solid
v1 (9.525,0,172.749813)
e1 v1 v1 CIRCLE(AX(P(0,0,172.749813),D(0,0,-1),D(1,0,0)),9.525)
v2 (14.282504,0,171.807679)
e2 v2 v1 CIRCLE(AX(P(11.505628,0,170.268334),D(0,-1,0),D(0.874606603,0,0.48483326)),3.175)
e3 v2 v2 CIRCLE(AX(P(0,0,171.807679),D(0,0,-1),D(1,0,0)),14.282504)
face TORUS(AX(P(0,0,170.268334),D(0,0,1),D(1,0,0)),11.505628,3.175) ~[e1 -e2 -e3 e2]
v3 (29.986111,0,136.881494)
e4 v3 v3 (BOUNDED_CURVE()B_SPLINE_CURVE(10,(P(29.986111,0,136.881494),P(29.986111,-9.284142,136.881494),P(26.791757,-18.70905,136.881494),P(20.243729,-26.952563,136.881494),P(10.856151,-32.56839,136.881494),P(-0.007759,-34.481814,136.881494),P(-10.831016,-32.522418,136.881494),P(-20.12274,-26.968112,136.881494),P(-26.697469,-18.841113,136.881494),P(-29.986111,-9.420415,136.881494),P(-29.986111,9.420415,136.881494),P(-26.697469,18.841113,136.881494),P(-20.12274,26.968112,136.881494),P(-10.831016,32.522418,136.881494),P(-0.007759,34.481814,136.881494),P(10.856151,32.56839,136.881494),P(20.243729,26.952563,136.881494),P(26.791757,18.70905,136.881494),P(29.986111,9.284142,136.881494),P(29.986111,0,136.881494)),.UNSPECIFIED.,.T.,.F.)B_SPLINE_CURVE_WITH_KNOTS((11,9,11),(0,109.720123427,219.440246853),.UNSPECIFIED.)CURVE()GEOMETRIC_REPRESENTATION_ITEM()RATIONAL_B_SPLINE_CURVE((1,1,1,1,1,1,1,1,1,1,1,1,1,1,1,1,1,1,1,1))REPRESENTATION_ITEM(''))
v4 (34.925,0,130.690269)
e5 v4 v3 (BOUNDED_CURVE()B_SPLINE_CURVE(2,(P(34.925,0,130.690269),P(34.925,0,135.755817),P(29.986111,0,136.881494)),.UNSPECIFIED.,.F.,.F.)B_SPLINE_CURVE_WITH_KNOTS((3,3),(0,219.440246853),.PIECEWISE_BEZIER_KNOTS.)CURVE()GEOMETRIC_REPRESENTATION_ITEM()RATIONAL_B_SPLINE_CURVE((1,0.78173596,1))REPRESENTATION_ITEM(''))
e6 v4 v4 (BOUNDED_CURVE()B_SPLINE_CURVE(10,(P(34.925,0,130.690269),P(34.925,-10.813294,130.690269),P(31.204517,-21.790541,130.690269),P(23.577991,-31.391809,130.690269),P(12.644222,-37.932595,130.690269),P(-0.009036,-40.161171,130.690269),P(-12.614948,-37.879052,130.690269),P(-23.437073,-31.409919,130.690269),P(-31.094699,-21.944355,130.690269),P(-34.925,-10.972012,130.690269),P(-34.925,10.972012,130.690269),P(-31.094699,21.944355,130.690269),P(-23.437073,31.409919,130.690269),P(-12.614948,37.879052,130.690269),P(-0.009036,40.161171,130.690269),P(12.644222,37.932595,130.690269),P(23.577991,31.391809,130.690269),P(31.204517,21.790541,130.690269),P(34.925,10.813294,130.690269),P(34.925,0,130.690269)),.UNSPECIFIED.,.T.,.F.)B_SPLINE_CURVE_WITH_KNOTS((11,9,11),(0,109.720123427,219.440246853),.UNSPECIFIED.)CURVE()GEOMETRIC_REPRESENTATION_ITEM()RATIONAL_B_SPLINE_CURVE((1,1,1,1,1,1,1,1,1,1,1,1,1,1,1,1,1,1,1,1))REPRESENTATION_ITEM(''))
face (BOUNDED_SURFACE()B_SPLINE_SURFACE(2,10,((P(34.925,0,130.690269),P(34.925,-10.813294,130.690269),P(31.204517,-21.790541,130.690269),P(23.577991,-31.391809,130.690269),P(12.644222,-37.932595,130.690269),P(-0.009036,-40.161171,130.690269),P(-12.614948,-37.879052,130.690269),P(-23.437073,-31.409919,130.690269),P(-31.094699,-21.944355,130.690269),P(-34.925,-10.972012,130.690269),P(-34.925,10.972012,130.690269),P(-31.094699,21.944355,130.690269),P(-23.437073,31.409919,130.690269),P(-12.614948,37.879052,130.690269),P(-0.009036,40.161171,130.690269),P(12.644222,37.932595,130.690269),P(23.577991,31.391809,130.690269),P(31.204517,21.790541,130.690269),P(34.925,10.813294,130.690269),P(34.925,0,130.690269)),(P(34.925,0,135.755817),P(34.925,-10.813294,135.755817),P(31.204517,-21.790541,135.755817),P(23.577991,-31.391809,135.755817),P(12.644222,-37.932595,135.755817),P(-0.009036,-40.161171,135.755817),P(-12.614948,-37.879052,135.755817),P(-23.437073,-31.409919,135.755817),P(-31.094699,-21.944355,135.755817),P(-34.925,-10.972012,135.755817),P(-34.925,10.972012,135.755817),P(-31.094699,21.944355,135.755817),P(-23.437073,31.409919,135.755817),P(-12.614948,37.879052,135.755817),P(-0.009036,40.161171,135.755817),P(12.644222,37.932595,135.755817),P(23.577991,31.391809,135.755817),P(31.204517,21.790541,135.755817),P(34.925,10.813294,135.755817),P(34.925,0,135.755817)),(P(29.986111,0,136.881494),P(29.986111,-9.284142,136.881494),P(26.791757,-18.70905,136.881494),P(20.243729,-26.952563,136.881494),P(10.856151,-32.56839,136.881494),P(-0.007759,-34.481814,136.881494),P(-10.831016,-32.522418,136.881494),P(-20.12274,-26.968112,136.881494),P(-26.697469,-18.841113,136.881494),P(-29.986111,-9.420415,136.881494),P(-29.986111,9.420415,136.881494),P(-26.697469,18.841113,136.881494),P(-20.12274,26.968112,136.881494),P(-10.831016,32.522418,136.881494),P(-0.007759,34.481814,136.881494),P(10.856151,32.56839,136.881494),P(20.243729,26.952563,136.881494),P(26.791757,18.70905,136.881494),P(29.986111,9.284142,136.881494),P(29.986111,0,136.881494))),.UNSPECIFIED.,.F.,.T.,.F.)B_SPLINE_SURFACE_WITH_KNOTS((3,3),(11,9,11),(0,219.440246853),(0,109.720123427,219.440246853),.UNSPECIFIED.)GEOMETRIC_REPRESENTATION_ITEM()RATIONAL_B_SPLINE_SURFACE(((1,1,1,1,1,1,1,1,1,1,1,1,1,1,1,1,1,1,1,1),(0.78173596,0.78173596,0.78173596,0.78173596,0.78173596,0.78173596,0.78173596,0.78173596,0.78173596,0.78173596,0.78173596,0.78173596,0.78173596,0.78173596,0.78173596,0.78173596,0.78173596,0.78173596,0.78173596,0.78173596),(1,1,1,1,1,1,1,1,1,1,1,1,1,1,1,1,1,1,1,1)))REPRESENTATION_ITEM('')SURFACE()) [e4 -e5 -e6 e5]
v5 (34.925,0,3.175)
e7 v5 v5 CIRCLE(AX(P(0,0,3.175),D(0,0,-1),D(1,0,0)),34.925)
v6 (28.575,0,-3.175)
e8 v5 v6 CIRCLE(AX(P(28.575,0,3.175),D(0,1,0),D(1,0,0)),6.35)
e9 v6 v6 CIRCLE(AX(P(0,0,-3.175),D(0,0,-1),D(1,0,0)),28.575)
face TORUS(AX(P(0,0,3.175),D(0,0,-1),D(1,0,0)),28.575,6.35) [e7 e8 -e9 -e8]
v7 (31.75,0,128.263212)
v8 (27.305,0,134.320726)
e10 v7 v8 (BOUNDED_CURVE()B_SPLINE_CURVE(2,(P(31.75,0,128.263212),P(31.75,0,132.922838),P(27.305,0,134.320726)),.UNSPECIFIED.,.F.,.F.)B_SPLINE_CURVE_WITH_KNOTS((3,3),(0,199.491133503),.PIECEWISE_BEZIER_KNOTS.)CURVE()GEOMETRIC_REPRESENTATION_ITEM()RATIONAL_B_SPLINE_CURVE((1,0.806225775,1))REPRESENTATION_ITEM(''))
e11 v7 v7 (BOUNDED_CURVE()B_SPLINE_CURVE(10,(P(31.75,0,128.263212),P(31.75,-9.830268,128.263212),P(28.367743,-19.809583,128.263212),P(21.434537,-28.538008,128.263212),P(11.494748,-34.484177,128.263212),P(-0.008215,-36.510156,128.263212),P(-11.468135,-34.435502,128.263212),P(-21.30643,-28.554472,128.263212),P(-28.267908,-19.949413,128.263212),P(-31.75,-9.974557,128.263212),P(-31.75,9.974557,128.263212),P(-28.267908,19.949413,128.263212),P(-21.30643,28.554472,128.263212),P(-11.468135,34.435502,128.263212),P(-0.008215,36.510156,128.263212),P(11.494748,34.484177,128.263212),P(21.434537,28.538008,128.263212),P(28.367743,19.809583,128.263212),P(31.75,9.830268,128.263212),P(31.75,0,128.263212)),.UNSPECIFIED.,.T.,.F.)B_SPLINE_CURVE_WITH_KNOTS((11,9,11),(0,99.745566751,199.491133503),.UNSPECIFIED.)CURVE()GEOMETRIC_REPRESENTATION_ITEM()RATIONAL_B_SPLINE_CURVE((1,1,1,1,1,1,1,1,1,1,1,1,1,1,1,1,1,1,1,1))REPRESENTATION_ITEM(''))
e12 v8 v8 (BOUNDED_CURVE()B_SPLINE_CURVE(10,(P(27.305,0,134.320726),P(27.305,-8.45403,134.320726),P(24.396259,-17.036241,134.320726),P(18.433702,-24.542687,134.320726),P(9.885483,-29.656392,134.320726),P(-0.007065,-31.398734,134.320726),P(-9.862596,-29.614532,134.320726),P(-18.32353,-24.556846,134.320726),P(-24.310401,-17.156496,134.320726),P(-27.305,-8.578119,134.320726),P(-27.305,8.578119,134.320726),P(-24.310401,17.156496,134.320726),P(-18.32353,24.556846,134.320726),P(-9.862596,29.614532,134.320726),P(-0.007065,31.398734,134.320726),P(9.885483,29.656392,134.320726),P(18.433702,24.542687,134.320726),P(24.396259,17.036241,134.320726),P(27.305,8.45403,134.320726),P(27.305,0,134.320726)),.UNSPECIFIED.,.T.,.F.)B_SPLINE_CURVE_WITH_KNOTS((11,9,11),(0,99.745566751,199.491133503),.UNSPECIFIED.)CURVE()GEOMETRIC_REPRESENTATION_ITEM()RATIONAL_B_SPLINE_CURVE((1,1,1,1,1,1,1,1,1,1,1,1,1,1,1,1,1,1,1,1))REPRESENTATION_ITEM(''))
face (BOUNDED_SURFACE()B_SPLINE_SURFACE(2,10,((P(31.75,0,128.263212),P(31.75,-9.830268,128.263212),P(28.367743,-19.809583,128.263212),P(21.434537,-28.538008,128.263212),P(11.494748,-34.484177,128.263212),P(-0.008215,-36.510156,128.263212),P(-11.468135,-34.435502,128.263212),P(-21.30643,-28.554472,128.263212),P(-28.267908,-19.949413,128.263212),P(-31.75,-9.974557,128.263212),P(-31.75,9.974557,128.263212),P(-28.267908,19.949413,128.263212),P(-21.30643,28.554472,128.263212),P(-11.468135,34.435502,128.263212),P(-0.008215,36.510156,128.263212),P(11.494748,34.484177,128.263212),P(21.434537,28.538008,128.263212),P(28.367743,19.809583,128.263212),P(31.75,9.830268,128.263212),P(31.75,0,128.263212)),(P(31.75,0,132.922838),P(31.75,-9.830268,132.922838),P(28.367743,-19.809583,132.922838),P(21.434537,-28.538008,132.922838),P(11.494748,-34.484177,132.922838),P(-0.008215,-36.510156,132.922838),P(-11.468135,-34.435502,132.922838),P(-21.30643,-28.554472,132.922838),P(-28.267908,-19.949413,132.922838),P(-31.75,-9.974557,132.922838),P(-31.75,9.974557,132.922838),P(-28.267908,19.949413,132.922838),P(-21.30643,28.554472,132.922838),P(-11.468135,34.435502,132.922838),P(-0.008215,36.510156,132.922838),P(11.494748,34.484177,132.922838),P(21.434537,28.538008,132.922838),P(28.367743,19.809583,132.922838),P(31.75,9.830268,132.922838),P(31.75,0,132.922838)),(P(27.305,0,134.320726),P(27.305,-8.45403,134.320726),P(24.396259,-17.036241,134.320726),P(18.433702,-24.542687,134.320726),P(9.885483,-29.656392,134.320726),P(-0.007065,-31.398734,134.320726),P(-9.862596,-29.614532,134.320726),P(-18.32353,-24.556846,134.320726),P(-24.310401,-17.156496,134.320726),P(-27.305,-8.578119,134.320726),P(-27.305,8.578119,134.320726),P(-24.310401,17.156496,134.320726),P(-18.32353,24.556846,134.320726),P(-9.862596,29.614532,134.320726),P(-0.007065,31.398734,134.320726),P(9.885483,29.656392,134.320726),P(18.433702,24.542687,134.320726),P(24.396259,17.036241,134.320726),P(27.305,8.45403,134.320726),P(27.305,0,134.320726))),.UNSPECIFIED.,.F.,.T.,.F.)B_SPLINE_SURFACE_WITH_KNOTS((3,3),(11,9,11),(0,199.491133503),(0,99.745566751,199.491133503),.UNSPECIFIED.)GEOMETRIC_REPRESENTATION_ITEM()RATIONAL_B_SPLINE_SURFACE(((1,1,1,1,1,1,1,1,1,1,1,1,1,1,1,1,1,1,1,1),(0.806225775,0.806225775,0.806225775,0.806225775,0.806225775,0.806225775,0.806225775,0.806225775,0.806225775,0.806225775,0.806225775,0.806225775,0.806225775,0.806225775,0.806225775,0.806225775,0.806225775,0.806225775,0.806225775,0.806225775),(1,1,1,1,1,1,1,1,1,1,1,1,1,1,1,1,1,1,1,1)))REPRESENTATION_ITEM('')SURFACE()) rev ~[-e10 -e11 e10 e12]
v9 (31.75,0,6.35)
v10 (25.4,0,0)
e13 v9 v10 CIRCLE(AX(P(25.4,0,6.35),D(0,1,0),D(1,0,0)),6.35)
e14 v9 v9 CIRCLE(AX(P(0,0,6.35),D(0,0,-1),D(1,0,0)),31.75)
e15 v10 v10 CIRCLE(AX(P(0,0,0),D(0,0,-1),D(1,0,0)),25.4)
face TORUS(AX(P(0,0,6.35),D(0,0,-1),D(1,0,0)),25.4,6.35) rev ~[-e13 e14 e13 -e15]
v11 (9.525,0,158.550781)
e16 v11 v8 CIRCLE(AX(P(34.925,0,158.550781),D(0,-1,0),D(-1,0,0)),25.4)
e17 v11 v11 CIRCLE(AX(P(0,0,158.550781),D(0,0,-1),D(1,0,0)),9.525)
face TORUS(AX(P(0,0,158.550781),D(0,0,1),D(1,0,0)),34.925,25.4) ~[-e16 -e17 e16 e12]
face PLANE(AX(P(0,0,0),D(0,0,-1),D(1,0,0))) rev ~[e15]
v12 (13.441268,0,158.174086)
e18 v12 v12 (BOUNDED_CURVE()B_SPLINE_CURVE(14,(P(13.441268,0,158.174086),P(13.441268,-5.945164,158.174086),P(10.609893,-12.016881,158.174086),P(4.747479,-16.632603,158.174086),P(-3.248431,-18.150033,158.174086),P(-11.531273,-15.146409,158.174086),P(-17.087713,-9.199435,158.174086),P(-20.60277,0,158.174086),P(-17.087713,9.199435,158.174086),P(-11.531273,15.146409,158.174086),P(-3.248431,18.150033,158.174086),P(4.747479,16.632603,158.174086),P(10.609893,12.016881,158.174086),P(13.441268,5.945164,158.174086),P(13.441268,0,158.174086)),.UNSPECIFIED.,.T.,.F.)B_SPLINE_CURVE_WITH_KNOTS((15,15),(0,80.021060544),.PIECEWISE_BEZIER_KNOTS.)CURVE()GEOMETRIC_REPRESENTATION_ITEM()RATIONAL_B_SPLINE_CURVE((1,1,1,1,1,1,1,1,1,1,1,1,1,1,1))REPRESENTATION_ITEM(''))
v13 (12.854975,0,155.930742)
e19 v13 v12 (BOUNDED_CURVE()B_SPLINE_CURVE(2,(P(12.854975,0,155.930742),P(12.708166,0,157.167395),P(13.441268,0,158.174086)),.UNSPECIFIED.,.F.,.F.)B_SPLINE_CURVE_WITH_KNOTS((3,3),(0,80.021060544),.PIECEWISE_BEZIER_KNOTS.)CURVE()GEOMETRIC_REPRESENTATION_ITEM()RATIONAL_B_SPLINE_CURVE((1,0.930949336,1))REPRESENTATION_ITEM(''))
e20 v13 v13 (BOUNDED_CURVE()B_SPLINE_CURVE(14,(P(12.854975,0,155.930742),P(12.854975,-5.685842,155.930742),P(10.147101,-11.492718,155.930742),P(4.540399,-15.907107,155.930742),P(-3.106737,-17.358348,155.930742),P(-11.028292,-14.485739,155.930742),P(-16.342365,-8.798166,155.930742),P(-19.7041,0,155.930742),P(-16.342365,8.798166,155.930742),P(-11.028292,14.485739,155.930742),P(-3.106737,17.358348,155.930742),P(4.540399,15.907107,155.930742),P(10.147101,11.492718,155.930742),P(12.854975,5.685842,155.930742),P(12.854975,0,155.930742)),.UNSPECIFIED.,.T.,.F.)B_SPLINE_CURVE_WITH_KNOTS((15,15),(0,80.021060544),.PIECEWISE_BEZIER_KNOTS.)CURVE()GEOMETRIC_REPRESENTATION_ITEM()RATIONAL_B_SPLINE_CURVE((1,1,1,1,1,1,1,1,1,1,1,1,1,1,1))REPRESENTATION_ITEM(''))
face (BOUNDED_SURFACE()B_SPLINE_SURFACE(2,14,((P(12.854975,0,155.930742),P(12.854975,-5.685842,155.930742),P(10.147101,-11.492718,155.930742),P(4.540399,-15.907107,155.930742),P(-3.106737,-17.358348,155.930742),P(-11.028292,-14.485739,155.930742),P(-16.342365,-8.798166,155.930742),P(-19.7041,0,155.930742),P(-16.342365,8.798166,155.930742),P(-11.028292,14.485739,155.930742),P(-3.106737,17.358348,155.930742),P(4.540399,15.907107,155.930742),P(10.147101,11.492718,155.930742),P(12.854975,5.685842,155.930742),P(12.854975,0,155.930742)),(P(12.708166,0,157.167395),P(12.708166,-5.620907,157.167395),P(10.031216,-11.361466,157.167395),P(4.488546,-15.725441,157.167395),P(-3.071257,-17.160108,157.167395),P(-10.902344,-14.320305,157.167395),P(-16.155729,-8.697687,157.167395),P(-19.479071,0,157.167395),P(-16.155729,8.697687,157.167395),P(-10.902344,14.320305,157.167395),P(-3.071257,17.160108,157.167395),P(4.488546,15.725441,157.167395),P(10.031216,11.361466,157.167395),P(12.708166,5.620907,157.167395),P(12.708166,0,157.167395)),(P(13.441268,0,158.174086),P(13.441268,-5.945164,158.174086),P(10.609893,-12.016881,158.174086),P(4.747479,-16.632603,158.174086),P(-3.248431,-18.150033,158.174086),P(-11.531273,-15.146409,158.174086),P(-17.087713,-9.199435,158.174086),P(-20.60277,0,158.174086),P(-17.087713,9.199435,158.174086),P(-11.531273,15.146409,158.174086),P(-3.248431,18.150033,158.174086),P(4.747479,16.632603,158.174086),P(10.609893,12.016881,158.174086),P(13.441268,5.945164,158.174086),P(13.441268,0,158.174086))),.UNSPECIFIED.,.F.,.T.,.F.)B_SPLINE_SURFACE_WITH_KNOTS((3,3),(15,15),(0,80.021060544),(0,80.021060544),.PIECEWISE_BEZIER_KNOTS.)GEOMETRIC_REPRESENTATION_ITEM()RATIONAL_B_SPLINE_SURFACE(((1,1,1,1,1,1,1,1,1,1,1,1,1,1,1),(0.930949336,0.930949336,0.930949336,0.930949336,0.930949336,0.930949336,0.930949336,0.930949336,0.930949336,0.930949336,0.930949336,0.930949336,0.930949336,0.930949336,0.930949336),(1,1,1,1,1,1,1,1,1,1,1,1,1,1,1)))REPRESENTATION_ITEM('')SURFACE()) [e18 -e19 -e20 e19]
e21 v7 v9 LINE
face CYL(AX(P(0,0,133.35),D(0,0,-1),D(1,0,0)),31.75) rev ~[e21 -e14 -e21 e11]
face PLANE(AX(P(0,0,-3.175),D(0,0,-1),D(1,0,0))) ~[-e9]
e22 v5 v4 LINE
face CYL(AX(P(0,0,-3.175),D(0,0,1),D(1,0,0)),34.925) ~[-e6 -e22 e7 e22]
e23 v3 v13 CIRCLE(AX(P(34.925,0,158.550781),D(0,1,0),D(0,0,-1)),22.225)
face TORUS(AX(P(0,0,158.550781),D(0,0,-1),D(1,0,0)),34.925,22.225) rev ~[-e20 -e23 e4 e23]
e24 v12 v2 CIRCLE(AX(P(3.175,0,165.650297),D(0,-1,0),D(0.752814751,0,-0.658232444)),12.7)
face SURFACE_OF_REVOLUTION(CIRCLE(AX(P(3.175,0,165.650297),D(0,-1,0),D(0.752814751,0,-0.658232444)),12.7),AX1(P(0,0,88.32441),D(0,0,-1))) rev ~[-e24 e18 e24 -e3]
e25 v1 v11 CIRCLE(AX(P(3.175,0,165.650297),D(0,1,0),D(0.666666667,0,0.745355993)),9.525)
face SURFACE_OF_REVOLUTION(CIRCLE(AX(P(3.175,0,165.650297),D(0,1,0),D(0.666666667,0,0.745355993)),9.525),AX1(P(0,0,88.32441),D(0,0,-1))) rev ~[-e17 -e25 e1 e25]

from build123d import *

# Parameters (mm, degrees)
F2_R = 6.35
F3_R = 6.35
F5_R = 3.175
F6_R = 6.35
F7_R = 6.35


# Not quite as in the source:
# - a fillet or chamfer that OpenCascade refuses, or shapes differently, is made with other operations: its cross-section is extruded or revolved along the edge and cut away or added


with BuildPart() as f1:
    # F0 (on Front) → F1 (revolve)
    with BuildSketch(Plane.XZ):
        with BuildLine():
            Line((31.75, 0), (0, 0))
            Line((0, 0), (0, -3.175))
            Line((0, -3.175), (34.925, -3.175))
            Line((34.925, -3.175), (34.925, 136.3257812379))
            ThreePointArc((34.925, 136.3257812379), (19.661541674, 142.3959842744), (12.7357473371, 157.2907450236))
            ThreePointArc((12.7357473371, 157.2907450236), (15.7038360971, 167.7283408709), (9.525, 176.6488196945))
            Line((9.525, 176.6488196945), (9.525, 172.749812895))
            ThreePointArc((9.525, 172.749812895), (12.7, 165.6502970665), (9.525, 158.5507812379))
            ThreePointArc((9.525, 158.5507812379), (15.875, 141.7502604126), (31.75, 133.35))
            Line((31.75, 133.35), (31.75, 0))
        make_face()
    revolve(axis=Axis((0, 0, 88.3244098473), (0, 0, -1)))

    # F2
    f2_edges = [f1.edges().sort_by_distance(p)[0] for p in [
        (-34.925, 0, 136.325781),
    ]]
    fillet(f2_edges, radius=F2_R)

    # F3
    f3_edges = [f1.edges().sort_by_distance(p)[0] for p in [
        (-34.925, 0, -3.175),
    ]]
    fillet(f3_edges, radius=F3_R)

    # F4: fillet of radius 3.175 on 1 edges, made by hand

    # F4_s1 → F4_t2 (revolve, cut)
    with BuildSketch(Plane.XZ):
        with BuildLine():
            ThreePointArc((14.2825038565, 171.8076794711), (12.1223989967, 173.382851233), (9.525, 172.749812895))
            Line((9.525, 172.749812895), (9.525, 176.6488196945))
            ThreePointArc((9.525, 176.6488196945), (12.2331604032, 174.5519671406), (14.2825038565, 171.8076794711))
        make_face()
    revolve(axis=Axis((0, 0, 176.6488196945), (0, 0, -1)), mode=Mode.SUBTRACT)

    # F5
    f5_edges = [f1.edges().sort_by_distance(p)[0] for p in [
        (-12.735747, 0, 157.290745),
    ]]
    fillet(f5_edges, radius=F5_R)

    # F6
    f6_edges = [f1.edges().sort_by_distance(p)[0] for p in [
        (-31.75, 0, 0),
    ]]
    fillet(f6_edges, radius=F6_R)

    # F7
    f7_edges = [f1.edges().sort_by_distance(p)[0] for p in [
        (-31.75, 0, 133.35),
    ]]
    fillet(f7_edges, radius=F7_R)


solid = f1.part
